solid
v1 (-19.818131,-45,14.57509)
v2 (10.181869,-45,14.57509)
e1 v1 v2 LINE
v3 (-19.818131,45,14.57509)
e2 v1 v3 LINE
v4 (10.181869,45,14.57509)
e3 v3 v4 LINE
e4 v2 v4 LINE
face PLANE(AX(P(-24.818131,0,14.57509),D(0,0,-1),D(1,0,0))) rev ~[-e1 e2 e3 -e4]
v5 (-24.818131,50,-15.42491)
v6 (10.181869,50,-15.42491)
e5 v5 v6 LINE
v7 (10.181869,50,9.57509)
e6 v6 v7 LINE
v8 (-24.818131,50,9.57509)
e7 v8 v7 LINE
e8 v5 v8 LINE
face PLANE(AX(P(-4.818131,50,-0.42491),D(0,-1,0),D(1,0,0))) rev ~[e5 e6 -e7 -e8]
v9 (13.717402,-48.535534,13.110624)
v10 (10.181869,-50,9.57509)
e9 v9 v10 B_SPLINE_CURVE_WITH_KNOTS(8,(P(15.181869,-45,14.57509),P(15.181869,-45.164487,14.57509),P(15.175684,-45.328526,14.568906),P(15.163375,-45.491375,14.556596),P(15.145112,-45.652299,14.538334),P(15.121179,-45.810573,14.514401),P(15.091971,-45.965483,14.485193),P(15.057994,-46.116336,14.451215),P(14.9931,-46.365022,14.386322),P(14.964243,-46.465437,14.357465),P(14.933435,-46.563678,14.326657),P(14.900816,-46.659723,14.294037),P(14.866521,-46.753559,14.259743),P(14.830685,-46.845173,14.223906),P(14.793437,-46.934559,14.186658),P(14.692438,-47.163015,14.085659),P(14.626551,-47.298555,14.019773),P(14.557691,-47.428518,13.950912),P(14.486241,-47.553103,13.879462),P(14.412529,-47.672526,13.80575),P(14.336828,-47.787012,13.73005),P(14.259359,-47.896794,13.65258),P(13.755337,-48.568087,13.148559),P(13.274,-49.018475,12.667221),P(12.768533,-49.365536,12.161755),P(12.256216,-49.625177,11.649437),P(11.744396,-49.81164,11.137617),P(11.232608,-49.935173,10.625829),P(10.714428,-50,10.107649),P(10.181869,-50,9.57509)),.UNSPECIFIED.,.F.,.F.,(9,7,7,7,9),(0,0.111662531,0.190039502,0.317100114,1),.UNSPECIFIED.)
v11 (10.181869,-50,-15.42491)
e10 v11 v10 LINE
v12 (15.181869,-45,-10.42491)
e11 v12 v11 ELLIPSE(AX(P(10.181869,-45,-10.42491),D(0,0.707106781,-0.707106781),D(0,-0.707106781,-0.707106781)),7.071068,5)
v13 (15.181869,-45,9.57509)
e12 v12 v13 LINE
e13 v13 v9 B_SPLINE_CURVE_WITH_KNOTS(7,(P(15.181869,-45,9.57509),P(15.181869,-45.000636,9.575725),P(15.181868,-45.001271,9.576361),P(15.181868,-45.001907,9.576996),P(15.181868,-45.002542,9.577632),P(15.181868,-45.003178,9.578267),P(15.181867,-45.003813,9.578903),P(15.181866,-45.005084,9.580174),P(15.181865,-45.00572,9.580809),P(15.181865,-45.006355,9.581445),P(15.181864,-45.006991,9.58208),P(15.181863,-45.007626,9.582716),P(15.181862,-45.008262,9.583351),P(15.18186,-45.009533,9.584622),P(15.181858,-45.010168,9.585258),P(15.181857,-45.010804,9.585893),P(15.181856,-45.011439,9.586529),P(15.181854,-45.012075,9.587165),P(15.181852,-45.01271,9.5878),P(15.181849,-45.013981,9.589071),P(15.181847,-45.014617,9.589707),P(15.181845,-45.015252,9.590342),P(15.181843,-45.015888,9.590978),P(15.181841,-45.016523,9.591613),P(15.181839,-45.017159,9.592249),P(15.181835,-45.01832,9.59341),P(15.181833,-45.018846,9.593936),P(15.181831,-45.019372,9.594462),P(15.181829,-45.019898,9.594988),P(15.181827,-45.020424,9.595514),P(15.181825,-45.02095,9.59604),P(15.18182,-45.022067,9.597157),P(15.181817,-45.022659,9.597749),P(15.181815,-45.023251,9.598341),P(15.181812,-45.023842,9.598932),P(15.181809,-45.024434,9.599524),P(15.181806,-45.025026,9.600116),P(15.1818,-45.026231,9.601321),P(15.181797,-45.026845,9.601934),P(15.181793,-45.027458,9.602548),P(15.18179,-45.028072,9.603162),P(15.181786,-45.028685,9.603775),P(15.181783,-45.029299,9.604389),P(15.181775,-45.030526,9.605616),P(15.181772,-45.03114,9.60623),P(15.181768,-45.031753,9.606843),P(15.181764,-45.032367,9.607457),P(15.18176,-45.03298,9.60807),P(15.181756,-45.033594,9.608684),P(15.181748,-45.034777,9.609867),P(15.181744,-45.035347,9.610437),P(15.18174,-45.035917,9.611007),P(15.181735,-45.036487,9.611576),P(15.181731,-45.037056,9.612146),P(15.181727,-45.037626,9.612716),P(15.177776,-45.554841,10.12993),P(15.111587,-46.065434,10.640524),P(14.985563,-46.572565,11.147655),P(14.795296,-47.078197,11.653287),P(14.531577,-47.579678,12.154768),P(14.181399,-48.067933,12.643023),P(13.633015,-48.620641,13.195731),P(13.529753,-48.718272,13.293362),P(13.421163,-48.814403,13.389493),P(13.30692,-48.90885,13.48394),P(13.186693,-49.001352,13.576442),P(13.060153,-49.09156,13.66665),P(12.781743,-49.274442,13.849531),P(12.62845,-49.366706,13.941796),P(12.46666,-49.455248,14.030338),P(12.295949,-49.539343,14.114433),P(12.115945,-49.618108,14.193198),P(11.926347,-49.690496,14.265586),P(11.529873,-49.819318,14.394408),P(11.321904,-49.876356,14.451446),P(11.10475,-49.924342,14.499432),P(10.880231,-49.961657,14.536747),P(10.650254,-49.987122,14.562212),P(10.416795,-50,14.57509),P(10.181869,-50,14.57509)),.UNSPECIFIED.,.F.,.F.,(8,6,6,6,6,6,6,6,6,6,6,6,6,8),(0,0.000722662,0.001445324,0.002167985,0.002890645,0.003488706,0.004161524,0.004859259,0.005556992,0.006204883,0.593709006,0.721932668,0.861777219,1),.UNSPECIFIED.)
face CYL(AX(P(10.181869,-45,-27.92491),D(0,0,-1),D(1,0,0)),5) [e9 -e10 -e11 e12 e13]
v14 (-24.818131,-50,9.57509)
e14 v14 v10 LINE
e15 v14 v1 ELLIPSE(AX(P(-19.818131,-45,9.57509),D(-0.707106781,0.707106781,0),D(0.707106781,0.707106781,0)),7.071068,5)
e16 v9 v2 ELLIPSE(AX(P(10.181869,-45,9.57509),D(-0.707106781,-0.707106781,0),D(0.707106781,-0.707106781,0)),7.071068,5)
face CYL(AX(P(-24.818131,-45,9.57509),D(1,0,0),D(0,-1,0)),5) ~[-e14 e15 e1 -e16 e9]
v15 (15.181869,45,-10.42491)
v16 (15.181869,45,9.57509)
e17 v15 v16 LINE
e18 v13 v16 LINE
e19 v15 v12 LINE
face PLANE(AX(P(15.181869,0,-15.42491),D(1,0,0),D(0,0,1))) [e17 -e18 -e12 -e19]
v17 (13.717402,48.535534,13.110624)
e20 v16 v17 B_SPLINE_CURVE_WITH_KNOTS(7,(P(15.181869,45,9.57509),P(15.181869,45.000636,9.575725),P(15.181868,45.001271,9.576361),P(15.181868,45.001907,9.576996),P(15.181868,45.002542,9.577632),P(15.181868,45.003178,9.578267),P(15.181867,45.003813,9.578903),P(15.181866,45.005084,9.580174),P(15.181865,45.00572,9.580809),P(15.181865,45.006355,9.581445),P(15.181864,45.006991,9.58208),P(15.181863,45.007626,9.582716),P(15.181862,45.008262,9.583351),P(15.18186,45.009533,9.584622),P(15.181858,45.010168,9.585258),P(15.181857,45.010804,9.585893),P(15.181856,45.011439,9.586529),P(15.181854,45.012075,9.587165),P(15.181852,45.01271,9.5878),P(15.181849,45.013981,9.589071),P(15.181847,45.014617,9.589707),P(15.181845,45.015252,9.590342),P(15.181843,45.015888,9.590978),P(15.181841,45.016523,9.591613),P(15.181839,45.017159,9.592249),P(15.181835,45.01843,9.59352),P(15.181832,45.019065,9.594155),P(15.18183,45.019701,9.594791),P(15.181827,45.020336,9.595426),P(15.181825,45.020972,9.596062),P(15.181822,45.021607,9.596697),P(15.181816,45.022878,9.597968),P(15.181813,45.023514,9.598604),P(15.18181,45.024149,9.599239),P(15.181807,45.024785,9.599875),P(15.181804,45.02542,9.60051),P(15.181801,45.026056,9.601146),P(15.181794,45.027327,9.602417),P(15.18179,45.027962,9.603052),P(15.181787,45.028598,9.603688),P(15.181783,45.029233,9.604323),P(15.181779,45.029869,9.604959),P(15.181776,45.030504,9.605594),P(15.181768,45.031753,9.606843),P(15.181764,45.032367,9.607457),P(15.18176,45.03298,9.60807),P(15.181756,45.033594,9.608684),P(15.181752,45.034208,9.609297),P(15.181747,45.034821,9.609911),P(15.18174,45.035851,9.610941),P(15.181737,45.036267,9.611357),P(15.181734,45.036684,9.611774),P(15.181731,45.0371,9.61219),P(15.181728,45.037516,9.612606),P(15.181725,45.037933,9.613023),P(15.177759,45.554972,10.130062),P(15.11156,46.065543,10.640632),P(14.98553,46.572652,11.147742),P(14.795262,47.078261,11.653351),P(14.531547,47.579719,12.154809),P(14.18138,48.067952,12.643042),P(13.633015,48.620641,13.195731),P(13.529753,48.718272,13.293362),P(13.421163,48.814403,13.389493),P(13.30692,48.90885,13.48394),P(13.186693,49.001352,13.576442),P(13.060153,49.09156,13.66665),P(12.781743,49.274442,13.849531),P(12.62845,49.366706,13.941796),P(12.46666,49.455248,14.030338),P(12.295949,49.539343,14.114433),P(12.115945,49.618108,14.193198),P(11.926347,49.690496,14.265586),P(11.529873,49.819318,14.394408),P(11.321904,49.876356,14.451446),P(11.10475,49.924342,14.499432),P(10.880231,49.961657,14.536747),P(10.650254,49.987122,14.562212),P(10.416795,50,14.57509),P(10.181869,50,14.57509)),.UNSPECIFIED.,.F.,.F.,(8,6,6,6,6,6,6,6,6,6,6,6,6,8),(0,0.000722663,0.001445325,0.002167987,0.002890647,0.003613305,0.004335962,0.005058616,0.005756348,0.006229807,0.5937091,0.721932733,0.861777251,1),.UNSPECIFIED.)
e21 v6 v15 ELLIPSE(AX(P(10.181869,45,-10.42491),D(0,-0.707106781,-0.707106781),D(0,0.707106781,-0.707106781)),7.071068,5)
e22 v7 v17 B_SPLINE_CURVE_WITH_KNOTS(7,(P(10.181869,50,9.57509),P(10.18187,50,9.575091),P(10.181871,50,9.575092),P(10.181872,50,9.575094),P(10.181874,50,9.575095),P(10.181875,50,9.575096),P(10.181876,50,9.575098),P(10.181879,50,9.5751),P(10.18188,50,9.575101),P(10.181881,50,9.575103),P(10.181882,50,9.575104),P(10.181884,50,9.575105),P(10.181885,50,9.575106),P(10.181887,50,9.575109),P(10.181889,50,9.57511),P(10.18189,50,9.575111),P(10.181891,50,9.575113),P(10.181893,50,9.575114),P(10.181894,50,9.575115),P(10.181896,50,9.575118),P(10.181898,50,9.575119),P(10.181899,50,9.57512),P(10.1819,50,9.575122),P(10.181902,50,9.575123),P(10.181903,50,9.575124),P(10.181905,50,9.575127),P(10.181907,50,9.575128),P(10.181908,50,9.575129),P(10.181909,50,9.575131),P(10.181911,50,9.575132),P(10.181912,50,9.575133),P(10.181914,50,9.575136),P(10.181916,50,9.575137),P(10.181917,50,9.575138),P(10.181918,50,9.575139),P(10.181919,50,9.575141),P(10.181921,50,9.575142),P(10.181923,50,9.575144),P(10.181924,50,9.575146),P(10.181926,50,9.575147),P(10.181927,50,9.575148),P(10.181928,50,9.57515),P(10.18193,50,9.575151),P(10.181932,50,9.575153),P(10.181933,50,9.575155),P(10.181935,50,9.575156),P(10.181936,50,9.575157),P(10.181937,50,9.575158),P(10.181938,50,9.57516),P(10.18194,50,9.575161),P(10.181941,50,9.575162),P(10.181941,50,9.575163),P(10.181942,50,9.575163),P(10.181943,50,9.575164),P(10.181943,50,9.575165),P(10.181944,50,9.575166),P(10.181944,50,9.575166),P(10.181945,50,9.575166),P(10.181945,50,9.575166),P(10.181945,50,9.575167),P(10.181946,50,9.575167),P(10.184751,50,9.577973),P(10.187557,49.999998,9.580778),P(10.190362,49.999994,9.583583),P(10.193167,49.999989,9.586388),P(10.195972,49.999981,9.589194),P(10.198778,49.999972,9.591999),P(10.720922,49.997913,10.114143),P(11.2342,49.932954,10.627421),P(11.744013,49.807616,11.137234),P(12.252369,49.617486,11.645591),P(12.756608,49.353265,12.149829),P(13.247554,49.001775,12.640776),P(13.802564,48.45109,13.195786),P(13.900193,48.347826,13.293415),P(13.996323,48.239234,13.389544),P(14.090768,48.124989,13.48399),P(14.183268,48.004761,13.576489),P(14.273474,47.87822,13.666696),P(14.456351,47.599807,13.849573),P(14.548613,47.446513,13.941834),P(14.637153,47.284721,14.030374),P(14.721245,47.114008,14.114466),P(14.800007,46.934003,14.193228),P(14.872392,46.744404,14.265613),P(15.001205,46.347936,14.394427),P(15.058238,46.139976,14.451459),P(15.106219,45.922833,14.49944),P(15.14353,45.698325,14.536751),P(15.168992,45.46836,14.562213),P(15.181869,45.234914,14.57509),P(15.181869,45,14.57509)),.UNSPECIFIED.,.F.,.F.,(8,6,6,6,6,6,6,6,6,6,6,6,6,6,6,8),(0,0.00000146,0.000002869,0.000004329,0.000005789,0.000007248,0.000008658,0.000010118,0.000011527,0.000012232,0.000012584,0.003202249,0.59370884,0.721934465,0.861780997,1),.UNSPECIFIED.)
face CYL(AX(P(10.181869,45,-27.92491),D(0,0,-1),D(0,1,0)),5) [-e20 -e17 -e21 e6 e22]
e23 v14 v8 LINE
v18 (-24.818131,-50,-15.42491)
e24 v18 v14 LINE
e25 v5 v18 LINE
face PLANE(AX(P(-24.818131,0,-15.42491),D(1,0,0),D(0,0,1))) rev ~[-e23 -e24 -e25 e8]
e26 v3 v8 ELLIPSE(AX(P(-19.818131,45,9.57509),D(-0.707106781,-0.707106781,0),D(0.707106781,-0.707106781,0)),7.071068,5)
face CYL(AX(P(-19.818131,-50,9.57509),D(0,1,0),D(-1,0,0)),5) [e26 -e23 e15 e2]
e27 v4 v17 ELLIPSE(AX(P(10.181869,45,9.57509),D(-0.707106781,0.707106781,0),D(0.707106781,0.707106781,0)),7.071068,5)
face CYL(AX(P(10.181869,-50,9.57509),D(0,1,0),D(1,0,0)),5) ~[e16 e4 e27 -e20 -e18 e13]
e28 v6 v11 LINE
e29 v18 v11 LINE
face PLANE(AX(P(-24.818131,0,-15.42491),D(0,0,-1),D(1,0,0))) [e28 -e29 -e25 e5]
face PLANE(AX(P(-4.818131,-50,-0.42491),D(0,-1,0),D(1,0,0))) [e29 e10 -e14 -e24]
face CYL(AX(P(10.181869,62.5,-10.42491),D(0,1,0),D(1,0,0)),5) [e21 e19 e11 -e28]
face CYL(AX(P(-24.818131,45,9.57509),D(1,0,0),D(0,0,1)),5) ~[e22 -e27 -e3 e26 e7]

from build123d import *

# Parameters (mm, degrees)
F0_W        = 40
F0_H        = 30
F1_DEPTH    = 50
F2_R        = 5
F3_T1_DEPTH = 50
F3_T3_DEPTH = 125


# Not quite as in the source:
# - a fillet or chamfer that OpenCascade refuses, or shapes differently, is made with other operations: its cross-section is extruded or revolved along the edge and cut away or added


with BuildPart() as f1:
    # F0 (on Front) → F1 (new body, symmetric)
    with BuildSketch(Plane.XZ):
        with Locations((-4.8181314529, -0.4249101039)):
            Rectangle(F0_W, F0_H)
    extrude(amount=F1_DEPTH, both=True)

    # F2
    f2_edges = [f1.edges().sort_by_distance(p)[0] for p in [
        (-4.818131, 50, 14.57509),
        (-24.818131, 0, 14.57509),
        (-4.818131, -50, 14.57509),
        (15.181869, 0, 14.57509),
    ]]
    fillet(f2_edges, radius=F2_R)

    # F3: fillet of radius 5 on 4 edges, made by hand

    # F3_s2 → F3_t1 (cut)
    with BuildSketch(Plane.XY.offset(-27.9249101039)):
        with BuildLine():
            ThreePointArc((10.1818685471, 50), (13.717402453, 48.5355339059), (15.1818685471, 45))
            Line((15.1818685471, 45), (15.1818685471, 50))
            Line((15.1818685471, 50), (10.1818685471, 50))
        make_face()
        with BuildLine():
            ThreePointArc((15.1818685471, -45), (13.717402453, -48.5355339059), (10.1818685471, -50))
            Line((10.1818685471, -50), (15.1818685471, -50))
            Line((15.1818685471, -50), (15.1818685471, -45))
        make_face()
    extrude(amount=F3_T1_DEPTH, mode=Mode.SUBTRACT)

    # F3_s4 → F3_t3 (cut)
    with BuildSketch(Plane.XZ.offset(-62.5)):
        with BuildLine():
            ThreePointArc((15.1818685471, -10.4249101039), (13.717402453, -13.9604440098), (10.1818685471, -15.4249101039))
            Line((10.1818685471, -15.4249101039), (15.1818685471, -15.4249101039))
            Line((15.1818685471, -15.4249101039), (15.1818685471, -10.4249101039))
        make_face()
    extrude(amount=F3_T3_DEPTH, mode=Mode.SUBTRACT)


solid = f1.part
